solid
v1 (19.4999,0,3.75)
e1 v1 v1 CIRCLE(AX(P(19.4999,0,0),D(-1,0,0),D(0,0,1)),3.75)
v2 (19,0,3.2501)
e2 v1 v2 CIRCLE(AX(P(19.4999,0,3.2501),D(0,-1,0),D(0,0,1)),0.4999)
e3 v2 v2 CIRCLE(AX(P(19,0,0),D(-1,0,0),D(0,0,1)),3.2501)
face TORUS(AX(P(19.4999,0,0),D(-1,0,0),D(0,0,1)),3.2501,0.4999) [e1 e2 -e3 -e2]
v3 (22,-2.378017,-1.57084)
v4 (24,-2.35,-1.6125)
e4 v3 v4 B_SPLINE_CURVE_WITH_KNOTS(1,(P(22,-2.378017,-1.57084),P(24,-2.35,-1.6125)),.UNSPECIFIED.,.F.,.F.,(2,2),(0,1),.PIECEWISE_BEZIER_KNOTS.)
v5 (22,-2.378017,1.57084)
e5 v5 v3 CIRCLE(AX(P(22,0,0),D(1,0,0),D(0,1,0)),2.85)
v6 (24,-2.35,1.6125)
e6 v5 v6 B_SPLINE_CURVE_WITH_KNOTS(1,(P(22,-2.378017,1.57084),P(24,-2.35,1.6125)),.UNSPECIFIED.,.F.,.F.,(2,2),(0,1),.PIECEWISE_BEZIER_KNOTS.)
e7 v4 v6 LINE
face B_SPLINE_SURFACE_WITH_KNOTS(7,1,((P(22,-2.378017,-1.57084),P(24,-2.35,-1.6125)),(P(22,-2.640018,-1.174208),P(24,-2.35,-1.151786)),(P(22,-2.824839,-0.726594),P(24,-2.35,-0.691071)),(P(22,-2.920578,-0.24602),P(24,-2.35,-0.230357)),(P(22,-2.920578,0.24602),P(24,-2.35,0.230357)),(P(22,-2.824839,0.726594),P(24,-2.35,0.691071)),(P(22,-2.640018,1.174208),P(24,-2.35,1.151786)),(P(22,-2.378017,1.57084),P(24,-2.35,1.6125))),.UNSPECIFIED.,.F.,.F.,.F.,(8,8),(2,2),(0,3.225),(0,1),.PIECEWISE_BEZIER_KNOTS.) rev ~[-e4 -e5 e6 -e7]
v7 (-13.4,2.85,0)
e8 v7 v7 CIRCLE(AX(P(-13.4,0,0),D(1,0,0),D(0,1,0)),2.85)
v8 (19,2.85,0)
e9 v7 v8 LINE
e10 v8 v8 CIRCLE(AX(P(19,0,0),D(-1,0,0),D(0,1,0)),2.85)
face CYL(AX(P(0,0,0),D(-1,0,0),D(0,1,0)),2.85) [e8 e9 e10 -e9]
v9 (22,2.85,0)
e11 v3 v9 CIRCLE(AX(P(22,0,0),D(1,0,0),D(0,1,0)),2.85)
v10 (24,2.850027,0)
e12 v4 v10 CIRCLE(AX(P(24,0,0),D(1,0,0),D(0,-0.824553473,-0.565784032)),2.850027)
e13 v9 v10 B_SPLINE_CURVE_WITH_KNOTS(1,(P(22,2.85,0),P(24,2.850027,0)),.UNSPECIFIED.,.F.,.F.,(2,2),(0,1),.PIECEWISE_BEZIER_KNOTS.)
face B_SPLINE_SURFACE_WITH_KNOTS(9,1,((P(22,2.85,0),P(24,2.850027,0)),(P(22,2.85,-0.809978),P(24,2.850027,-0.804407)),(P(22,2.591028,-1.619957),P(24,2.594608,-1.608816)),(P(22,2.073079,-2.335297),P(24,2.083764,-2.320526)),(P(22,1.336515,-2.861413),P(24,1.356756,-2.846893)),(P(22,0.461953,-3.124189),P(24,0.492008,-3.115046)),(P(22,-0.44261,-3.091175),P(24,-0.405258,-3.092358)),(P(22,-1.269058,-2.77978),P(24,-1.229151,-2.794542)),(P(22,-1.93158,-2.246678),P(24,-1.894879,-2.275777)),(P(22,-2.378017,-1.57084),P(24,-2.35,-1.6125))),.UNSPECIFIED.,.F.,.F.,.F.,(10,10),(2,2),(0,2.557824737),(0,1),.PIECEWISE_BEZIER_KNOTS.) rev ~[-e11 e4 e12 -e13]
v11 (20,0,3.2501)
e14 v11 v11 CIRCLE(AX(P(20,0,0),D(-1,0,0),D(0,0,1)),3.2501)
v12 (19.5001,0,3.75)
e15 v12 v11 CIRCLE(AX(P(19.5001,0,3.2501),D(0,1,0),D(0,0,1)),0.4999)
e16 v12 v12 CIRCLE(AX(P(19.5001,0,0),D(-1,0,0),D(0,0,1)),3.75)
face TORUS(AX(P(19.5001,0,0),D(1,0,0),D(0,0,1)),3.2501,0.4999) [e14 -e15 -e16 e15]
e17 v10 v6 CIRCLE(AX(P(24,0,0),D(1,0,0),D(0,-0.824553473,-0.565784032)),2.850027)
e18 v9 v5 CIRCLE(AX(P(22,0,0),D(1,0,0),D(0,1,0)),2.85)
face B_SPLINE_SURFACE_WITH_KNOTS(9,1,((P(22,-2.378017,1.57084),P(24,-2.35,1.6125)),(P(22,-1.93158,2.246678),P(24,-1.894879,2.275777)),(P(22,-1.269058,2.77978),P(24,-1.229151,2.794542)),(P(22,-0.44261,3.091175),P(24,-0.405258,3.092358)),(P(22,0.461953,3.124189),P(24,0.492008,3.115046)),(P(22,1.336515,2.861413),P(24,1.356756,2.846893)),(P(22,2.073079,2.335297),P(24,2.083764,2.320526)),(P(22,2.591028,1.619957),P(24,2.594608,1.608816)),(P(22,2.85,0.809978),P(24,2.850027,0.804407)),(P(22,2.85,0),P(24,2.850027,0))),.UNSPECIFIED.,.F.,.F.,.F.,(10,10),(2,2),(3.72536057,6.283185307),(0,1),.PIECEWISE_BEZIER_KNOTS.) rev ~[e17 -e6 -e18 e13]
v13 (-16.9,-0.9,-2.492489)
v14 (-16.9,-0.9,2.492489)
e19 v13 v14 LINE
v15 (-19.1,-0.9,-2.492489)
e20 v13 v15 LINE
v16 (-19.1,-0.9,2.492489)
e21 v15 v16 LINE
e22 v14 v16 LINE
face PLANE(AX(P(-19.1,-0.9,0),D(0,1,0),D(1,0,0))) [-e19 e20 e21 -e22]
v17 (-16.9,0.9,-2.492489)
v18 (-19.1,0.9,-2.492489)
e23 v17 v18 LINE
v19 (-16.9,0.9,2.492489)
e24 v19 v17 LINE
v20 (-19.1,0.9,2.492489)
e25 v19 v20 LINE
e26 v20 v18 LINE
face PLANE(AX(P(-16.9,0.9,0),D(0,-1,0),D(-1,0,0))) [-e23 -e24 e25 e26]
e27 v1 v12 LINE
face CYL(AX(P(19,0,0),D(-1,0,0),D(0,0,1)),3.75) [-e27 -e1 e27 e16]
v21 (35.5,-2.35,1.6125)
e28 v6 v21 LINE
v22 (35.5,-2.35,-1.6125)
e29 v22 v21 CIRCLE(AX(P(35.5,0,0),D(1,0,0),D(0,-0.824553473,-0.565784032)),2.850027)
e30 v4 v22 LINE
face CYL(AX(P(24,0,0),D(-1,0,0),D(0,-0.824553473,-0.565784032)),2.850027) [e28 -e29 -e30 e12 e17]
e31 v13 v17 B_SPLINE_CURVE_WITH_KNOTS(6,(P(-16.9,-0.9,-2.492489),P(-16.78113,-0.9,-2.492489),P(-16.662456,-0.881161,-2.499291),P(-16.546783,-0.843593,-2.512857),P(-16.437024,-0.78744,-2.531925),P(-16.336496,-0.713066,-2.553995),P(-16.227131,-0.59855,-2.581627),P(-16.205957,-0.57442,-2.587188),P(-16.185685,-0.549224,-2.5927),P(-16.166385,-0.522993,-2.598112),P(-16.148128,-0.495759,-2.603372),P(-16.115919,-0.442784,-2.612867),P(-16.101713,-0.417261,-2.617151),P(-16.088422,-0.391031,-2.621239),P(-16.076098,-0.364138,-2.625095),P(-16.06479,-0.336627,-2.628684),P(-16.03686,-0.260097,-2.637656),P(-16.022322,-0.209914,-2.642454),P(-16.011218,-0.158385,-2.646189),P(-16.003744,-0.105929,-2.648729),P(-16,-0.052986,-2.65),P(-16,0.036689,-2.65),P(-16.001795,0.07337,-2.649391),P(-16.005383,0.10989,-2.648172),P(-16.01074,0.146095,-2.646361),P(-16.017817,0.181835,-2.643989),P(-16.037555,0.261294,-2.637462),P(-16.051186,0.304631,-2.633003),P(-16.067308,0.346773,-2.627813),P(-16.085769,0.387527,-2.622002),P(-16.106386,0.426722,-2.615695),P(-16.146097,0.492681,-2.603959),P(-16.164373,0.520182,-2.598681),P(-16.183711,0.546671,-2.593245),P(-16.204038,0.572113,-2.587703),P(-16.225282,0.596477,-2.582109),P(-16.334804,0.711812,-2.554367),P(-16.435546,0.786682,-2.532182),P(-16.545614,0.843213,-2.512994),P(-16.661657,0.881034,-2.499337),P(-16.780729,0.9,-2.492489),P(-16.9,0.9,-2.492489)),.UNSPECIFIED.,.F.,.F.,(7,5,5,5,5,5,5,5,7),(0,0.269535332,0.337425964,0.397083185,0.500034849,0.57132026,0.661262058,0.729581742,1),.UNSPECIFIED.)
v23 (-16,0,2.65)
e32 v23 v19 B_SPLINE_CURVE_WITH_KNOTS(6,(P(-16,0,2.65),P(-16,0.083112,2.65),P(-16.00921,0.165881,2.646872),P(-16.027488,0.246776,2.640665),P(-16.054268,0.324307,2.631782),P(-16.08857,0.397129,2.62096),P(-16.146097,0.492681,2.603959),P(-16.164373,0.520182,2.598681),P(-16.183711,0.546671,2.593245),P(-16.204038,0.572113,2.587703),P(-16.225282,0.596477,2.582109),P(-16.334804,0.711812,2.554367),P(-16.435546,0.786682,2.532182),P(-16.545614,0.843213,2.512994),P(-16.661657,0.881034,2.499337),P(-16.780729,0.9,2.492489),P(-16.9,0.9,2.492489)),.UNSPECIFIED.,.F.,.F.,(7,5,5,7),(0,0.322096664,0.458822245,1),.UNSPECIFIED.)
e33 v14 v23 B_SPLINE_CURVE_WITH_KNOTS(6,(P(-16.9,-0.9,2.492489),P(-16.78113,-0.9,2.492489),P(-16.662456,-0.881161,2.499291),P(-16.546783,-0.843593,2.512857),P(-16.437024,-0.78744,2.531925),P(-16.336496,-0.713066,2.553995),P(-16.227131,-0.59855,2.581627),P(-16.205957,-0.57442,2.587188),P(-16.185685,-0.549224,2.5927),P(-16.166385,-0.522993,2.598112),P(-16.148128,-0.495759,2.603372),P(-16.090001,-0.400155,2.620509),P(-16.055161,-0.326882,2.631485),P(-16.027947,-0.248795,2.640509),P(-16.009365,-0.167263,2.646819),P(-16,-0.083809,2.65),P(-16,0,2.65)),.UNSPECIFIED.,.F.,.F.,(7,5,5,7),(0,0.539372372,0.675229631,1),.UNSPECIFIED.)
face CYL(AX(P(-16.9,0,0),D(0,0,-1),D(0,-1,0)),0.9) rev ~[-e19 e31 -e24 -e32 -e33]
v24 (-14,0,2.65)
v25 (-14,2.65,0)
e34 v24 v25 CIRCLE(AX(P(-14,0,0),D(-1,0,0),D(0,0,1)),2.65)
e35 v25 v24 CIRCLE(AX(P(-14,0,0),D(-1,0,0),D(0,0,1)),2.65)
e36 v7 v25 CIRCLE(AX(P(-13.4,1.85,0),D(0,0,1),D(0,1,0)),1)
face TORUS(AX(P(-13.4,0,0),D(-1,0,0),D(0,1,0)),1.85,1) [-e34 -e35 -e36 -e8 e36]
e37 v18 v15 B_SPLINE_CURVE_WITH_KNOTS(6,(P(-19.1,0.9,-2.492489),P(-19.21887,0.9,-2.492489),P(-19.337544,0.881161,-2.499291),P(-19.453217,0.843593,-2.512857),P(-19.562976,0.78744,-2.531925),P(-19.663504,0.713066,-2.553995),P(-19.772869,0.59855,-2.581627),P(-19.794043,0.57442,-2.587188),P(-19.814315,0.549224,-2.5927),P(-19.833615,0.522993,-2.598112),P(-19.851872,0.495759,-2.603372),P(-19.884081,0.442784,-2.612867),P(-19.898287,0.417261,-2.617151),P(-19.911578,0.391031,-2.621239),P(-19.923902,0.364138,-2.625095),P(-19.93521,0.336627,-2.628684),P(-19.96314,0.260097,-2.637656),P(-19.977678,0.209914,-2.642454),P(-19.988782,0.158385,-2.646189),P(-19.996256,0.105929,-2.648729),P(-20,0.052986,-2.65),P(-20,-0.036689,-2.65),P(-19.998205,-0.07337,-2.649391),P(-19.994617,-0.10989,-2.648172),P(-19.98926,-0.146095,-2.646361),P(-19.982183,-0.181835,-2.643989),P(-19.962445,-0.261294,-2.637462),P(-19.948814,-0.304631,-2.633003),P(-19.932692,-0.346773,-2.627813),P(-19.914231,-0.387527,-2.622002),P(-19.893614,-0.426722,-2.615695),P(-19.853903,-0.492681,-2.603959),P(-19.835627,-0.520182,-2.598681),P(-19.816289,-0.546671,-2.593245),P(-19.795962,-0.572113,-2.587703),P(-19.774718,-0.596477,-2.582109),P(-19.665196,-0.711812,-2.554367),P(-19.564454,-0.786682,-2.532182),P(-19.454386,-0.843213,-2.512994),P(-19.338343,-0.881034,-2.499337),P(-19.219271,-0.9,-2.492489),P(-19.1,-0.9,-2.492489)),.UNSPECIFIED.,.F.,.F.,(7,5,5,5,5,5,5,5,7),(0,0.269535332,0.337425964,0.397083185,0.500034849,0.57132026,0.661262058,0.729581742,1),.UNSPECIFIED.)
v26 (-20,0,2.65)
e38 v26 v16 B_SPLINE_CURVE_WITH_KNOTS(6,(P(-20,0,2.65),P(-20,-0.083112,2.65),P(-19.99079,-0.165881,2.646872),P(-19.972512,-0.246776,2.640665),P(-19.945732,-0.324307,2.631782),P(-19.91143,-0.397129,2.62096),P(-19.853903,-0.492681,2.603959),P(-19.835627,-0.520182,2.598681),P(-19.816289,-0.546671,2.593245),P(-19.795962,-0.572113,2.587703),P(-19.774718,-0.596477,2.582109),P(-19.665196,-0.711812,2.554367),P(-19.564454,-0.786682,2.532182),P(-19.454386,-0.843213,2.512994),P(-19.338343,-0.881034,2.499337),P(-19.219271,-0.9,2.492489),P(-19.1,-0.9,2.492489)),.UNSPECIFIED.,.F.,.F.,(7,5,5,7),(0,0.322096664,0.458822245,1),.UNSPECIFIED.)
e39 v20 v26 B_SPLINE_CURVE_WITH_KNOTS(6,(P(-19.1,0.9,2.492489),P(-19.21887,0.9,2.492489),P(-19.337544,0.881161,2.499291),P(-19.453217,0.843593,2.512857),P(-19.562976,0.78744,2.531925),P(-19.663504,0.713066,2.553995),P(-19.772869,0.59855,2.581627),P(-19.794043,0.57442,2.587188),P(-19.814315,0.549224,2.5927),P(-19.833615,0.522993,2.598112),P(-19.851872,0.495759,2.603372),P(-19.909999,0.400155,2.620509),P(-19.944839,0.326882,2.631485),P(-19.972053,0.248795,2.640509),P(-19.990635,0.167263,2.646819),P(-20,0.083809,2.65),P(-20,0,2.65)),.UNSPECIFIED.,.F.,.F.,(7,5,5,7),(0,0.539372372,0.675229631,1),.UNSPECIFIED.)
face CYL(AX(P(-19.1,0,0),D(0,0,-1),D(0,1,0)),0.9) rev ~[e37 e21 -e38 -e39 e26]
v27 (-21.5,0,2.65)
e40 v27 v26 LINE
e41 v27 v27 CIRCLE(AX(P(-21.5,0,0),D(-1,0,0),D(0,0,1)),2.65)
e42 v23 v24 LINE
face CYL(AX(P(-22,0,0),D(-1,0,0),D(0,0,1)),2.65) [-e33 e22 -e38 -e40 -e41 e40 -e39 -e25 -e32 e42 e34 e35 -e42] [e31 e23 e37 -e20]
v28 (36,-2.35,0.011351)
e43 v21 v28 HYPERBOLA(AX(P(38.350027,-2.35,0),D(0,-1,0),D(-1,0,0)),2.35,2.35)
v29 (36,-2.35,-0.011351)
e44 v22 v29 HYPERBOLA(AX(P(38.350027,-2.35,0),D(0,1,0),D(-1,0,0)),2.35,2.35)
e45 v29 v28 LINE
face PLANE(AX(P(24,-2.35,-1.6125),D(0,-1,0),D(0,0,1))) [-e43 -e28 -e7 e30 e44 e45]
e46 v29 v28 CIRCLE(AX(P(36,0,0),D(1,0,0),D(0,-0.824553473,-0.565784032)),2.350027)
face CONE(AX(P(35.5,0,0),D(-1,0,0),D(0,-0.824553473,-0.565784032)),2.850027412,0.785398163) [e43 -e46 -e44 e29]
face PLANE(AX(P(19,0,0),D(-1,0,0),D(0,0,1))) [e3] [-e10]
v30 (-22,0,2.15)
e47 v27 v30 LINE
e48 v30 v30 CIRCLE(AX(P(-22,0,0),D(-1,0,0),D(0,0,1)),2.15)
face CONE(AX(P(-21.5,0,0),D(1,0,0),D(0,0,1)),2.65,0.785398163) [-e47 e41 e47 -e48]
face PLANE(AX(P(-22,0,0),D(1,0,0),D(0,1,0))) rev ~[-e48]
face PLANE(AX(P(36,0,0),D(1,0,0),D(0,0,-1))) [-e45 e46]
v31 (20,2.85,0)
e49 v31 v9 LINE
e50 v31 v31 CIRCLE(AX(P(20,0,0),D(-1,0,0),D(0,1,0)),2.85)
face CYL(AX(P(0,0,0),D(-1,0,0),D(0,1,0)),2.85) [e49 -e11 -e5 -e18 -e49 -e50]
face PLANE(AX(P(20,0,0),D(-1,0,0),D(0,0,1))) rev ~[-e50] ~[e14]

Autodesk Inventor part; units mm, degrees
ref_plane "YZ Plane" through (0, 0, 0) normal (1, 0, 0) x (0, 1, 0)
sketch "Sketch1" plane through (0, 0, 0) normal (1, 0, 0) x (0, 1, 0)
  circle A0 centre (0, 0) radius 2.85
  dimension "diameter" = 5.7
extrude "Shaft" add sketch "Sketch1" along normal mid plane 44
sketch "Sketch2" plane through (0, 0, 0) normal (0, 0, 1) x (1, 0, 0)
  line L0 (-22, -2.85) -> (-22, 2.85) construction
  line L1 (22, -2.85) -> (-22, -2.85) construction
  line L2 (22, 2.85) -> (22, -2.85) construction
  line L3 (-22, 2.85) -> (22, 2.85) construction
  line L4 (-22, -2.85) -> (22, -2.85) projected
  line L5 (-15, -2.85) -> (-15, -2.85)
  line L6 (-22, -2.85) -> (22, -2.85) projected
  line L7 (-20, 0) -> (-16, 0) construction
  line L8 (-19.1, -0.9) -> (-16.9, -0.9)
  line L9 (-16.9, 0.9) -> (-19.1, 0.9)
  arc A0 (-19.1, 0.9) -> (-19.1, -0.9) centre (-19.1, 0) ccw
  arc A1 (-16.9, -0.9) -> (-16.9, 0.9) centre (-16.9, 0) ccw
  point P0 (0, 0)
  point P1 (22, 0)
  point P2 (-18, 0)
  dimension "d17" = 1.8
  dimension "d20" = 2
  dimension "d21" = 1
  dimension "d22" = 7
extrude "Slot for Differential Gear" cut sketch "Sketch2" along normal through all both and the other way through all
ref_plane "Work Plane1" through (24, 0, 0) normal (1, 0, 0) x (0, 0, -1)
sketch "Sketch3" plane through (24, 0, 0) normal (1, 0, 0) x (0, 0, -1)
  arc A0 (1.6583, -2.5) -> (-1.6583, -2.5) centre (0, 0) ccw construction
  circle A1 centre (0, 0) radius 2.85 construction
  line L0 (-1.6583, -2.5) -> (1.6583, -2.5)
  arc A2 (1.6125, -2.35) -> (-1.6125, -2.35) centre (0, 0) ccw
  line L1 (1.6125, -2.35) -> (-1.6125, -2.35)
  point P0 (-1.3684, -2.5)
  point P1 (1.3684, -2.5)
  dimension "d49" = 3
  dimension "d50" = 2.5
  dimension "wheel_offset" = 0.15
extrude "Wheel Insert Profile" add sketch "Sketch3" along normal blind 12
loft "Loft1" add section 1 edges at (22, -2.85, 0) section 2 edges at (24, -2.35, 0) (24, 2.85, 0)
ref_plane "Work Plane2" through (19, 0, 0) normal (-1, 0, 0) x (0, 0, 1)
sketch "Sketch4" plane through (19, 0, 0) normal (-1, 0, 0) x (0, 0, 1)
  circle A0 centre (0, 0) radius 3.75
  dimension "d35" = 7.5
extrude "Stopper" add sketch "Sketch4" against normal blind 1
fillet "Fillet1" radius 0.5 2 edges at (19, 0, -3.75) (20, 0, -3.75)
sketch "Sketch8" plane through (-22, 0, 0) normal (-1, 0, 0) x (0, 0, 1)
  circle A0 centre (0, 0) radius 2.85 projected
  circle A1 centre (0, 0) radius 2.7 construction
  circle A2 centre (0, 0) radius 2.65
  dimension "d68" = 5.4
  dimension "d69" = 0.05
extrude "Differential Gear Insert Profile" cut sketch "Sketch8" against normal blind 8
fillet "Fillet3" radius 1 1 edges at (-14, -2.85, 0)
chamfer "Chamfer4" distance 0.5 angle 45 2 edges at (-22, 0, -2.65) (36, 2.85, 0)
properties part number "rear shaft v2"
